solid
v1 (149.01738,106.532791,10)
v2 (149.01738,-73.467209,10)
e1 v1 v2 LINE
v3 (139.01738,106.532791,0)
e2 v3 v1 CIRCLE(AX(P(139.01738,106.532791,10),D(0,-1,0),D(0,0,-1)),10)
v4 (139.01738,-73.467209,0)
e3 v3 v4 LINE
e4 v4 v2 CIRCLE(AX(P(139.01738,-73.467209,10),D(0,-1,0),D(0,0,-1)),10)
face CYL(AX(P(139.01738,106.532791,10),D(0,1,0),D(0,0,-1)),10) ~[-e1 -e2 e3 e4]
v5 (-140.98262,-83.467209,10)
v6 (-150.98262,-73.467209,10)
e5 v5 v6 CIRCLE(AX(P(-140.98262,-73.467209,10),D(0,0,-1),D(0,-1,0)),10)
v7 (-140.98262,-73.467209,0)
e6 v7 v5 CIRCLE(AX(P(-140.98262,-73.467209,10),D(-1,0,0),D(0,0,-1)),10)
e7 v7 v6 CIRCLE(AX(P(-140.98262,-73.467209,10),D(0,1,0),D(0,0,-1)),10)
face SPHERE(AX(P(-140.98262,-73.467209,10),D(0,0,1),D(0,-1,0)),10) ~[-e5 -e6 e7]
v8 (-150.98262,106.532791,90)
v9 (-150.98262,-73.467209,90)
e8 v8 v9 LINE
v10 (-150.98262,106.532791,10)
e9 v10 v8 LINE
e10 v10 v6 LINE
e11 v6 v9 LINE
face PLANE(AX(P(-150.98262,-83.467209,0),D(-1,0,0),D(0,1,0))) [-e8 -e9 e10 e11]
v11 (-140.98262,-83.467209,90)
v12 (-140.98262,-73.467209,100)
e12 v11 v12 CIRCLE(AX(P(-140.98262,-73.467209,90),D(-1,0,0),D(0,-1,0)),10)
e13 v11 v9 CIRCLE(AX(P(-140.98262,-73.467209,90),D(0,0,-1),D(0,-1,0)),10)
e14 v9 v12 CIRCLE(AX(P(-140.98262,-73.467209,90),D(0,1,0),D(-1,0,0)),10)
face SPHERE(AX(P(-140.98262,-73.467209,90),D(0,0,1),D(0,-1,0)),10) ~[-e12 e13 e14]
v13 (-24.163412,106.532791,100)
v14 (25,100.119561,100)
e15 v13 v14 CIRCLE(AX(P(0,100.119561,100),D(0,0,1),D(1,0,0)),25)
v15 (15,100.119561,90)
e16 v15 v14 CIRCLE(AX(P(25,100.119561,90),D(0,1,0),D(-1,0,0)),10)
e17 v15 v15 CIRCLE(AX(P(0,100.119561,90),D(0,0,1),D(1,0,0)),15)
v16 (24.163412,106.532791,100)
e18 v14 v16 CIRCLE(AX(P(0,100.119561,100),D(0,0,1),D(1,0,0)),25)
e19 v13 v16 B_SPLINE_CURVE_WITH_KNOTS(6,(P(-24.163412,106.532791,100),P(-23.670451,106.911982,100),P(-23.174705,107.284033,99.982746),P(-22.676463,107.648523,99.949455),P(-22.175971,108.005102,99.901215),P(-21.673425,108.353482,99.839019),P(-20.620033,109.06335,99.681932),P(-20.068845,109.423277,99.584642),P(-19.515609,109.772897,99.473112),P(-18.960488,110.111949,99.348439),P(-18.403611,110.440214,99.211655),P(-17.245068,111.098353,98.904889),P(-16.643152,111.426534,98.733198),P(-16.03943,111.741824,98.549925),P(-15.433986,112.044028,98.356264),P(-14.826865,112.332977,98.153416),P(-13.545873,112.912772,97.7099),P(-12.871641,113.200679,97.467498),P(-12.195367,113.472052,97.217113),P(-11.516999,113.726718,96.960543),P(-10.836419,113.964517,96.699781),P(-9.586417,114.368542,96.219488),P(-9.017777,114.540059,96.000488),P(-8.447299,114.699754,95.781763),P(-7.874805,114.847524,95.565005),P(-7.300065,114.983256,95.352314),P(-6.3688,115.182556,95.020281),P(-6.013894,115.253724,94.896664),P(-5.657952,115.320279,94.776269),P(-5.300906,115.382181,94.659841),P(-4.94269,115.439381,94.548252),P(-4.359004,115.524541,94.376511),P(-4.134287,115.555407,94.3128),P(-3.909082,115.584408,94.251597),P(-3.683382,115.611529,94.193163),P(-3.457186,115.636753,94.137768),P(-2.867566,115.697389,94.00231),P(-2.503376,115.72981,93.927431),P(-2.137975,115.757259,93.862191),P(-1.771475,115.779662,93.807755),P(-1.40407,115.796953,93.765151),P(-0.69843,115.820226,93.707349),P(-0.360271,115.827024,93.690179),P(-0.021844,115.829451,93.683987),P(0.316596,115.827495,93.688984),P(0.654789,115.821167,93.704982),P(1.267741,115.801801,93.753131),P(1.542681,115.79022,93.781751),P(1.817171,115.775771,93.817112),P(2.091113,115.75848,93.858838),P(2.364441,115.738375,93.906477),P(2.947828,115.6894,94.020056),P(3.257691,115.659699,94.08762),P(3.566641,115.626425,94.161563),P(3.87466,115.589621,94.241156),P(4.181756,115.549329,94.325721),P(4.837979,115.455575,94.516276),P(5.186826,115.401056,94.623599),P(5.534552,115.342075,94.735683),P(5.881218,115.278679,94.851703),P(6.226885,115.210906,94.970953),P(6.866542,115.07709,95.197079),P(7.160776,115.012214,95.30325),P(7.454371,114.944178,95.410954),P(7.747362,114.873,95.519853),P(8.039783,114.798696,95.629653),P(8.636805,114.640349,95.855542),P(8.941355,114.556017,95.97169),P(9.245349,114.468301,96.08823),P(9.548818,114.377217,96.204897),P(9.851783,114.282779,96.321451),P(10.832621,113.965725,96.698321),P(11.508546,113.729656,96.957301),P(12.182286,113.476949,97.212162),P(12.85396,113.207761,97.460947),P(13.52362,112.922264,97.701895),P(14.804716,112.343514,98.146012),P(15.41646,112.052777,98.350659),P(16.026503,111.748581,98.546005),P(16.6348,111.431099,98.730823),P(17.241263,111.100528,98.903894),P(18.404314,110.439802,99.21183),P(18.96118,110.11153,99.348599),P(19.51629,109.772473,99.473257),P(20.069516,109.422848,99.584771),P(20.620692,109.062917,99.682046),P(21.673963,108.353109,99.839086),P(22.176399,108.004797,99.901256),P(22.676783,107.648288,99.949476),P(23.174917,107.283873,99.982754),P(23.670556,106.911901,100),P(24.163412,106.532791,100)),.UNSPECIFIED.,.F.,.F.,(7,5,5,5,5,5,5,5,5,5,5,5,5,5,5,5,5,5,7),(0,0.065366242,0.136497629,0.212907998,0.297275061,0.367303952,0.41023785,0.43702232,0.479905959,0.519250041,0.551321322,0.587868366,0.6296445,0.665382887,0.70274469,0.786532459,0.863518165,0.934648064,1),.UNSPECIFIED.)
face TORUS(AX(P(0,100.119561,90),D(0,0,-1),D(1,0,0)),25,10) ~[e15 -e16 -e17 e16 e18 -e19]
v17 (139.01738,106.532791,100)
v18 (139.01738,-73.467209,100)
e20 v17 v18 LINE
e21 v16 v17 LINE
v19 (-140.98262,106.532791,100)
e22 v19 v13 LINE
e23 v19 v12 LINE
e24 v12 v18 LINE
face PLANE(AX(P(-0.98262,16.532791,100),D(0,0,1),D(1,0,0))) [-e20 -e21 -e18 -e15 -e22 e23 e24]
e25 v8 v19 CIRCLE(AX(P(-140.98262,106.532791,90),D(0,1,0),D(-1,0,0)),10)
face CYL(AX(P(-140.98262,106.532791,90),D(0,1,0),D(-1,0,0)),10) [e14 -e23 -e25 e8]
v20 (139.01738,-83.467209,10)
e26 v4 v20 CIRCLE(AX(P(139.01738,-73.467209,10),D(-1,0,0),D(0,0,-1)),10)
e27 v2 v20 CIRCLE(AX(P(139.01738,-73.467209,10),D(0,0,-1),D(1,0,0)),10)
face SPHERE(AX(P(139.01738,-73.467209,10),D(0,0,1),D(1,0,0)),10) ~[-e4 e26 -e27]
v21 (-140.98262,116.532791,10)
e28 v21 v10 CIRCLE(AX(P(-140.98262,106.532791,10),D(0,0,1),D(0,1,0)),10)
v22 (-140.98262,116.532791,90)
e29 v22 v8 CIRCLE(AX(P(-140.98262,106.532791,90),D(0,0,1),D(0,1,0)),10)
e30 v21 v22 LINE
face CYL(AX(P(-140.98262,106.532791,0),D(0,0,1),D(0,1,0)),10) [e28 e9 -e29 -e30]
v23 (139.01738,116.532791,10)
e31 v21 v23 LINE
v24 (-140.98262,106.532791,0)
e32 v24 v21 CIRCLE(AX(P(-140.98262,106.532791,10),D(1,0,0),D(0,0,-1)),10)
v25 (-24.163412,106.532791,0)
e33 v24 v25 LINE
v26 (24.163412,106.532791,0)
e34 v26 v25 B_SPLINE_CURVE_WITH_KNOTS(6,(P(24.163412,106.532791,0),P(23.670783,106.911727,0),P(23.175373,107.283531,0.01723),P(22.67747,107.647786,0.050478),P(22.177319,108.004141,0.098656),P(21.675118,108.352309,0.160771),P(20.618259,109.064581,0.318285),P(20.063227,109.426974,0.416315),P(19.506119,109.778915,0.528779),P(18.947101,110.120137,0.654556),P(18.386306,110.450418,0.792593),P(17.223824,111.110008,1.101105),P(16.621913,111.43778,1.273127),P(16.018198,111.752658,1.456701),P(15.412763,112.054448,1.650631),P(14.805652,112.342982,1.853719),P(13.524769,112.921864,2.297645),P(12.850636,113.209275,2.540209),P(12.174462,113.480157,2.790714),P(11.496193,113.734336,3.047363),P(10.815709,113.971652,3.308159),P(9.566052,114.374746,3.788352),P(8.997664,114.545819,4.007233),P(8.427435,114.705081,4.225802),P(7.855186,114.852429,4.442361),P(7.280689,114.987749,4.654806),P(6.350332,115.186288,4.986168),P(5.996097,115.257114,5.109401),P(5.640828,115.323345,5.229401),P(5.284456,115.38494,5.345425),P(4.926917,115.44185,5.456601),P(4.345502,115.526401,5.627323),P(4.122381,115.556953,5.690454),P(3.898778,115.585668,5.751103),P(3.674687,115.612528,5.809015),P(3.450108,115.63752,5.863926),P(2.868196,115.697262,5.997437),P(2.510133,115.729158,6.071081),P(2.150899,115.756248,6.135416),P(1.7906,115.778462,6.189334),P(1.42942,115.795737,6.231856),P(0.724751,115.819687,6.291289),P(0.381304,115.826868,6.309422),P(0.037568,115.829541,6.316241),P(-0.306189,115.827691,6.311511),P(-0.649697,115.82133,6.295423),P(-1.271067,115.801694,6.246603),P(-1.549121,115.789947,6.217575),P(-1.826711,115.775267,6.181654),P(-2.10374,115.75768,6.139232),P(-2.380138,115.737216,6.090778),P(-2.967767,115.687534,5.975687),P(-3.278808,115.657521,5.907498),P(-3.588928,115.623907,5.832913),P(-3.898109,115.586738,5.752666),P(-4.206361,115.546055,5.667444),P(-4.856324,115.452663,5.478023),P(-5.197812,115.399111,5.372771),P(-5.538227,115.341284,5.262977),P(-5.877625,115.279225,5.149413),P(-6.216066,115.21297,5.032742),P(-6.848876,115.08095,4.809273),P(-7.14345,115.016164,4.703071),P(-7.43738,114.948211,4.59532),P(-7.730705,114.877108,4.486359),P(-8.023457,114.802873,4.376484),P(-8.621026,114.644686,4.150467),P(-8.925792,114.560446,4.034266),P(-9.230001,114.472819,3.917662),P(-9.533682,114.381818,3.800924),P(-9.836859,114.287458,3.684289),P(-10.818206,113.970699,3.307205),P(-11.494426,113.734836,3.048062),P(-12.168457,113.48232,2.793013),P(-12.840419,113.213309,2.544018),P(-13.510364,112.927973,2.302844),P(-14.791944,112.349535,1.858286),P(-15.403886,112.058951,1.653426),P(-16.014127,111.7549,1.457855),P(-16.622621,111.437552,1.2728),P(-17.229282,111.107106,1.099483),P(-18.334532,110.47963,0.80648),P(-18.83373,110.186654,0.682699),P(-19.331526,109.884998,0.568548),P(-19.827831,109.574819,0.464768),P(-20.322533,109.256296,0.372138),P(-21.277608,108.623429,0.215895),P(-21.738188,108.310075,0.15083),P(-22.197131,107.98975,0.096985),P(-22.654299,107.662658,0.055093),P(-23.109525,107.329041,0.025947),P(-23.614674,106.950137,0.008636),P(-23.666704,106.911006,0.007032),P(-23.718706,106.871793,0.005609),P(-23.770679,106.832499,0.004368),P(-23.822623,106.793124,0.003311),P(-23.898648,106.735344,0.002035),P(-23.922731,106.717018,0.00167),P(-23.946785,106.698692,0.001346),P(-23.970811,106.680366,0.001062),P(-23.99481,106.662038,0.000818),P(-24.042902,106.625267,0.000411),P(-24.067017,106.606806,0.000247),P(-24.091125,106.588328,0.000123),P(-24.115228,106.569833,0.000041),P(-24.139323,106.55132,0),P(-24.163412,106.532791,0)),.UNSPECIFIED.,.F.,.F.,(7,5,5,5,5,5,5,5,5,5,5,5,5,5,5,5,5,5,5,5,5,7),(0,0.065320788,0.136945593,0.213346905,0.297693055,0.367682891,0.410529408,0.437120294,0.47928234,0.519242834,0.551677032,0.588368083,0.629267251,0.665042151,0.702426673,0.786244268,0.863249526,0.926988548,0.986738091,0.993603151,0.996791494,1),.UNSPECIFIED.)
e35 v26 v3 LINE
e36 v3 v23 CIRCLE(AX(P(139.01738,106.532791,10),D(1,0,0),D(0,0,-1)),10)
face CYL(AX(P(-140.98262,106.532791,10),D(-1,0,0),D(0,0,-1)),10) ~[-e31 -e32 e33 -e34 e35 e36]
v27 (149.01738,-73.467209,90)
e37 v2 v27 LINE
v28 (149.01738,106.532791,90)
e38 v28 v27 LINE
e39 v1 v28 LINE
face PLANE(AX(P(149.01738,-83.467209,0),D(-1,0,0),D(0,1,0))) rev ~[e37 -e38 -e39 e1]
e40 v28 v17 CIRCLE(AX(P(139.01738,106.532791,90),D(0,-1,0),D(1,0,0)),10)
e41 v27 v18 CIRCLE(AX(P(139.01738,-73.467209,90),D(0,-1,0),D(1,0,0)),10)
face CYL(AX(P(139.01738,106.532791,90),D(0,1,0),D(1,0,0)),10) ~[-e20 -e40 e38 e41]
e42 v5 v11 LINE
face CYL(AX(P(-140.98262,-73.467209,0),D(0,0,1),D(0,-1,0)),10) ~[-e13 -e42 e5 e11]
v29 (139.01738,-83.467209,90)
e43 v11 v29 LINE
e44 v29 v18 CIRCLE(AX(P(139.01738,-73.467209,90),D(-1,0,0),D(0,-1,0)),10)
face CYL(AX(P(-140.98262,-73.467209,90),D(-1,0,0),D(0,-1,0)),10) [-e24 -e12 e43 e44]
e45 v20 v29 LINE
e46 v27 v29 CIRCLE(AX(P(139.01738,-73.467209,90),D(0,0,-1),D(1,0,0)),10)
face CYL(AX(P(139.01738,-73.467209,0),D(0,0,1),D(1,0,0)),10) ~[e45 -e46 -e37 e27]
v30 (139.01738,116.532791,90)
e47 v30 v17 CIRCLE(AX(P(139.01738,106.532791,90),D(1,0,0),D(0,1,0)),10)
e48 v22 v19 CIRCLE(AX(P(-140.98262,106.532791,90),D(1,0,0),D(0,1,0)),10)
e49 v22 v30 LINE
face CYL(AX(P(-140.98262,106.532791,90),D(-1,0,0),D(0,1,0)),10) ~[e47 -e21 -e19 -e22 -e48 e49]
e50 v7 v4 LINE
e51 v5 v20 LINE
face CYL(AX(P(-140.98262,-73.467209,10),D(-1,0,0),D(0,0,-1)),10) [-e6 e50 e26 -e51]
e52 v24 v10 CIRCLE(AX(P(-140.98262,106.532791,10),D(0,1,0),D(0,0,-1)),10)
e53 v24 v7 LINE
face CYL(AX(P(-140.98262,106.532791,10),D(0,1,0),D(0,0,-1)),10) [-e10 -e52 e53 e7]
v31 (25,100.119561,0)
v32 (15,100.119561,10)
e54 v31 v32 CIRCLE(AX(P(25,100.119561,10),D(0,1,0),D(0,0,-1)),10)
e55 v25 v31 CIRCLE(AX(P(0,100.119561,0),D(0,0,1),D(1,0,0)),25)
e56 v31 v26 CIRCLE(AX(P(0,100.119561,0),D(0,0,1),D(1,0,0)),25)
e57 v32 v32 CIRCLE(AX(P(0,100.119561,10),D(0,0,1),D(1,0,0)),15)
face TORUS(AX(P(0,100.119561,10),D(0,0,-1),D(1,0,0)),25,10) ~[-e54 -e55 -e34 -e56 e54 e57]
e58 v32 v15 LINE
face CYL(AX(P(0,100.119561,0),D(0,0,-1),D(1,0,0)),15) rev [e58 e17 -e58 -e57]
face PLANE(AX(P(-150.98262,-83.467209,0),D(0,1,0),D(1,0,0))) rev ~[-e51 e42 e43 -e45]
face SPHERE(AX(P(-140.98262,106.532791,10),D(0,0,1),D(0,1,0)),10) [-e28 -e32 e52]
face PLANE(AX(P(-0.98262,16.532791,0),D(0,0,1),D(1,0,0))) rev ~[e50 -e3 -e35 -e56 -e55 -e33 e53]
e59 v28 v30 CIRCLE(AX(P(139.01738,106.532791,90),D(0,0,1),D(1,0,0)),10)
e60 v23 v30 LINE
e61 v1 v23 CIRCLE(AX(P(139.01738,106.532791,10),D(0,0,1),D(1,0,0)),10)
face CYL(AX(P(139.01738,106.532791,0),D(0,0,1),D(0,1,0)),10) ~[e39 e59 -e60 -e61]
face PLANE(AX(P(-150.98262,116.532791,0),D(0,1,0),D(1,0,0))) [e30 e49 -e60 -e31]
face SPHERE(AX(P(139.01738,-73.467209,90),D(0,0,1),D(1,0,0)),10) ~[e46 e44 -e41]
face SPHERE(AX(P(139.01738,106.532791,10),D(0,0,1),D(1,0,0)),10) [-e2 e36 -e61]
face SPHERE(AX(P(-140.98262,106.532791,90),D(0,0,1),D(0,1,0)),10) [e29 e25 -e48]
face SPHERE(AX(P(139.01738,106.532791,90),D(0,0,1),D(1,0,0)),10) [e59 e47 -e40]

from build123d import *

# Parameters (mm, degrees)
F0_W         = 300
F0_H         = 200
F0_R         = 15
F1_DEPTH     = 100
F2_R         = 10
F3_R         = 10
F4_R         = 10
F5_R         = 10
F6_T1_DEPTH  = 280
F6_T3_DEPTH  = 180
F6_T6_ANGLE  = 90
F6_T8_ANGLE  = 90
F6_T10_ANGLE = 90
F6_T12_ANGLE = 90
F7_T1_DEPTH  = 280
F7_T3_DEPTH  = 180
F7_T6_ANGLE  = 90
F7_T8_ANGLE  = 90
F7_T10_ANGLE = 90
F7_T12_ANGLE = 90


# Not quite as in the source:
# - a fillet or chamfer that OpenCascade refuses, or shapes differently, is made with other operations: its cross-section is extruded or revolved along the edge and cut away or added


with BuildPart() as f1:
    # F0 (on Top) → F1 (new body)
    with BuildSketch(Plane.XY):
        with Locations((-0.982619822, 16.5327907399)):
            Rectangle(F0_W, F0_H)
        with Locations((0, 100.119560957)):
            Circle(F0_R, mode=Mode.SUBTRACT)
    extrude(amount=F1_DEPTH)

    # F2
    f2_edges = [f1.edges().sort_by_distance(p)[0] for p in [
        (149.01738, 116.532791, 50),
    ]]
    fillet(f2_edges, radius=F2_R)

    # F3
    f3_edges = [f1.edges().sort_by_distance(p)[0] for p in [
        (-150.98262, 116.532791, 50),
    ]]
    fillet(f3_edges, radius=F3_R)

    # F4
    f4_edges = [f1.edges().sort_by_distance(p)[0] for p in [
        (149.01738, -83.467209, 50),
    ]]
    fillet(f4_edges, radius=F4_R)

    # F5
    f5_edges = [f1.edges().sort_by_distance(p)[0] for p in [
        (-150.98262, -83.467209, 50),
    ]]
    fillet(f5_edges, radius=F5_R)

    # F6: fillet of radius 10 on 9 edges, made by hand

    # F6_s2 → F6_t1 (cut)
    with BuildSketch(Plane.YZ.offset(-140.982619822)):
        with BuildLine():
            ThreePointArc((-83.4672092601, 90), (-80.538277072, 97.0710678119), (-73.4672092601, 100))
            Line((-73.4672092601, 100), (-83.4672092601, 100))
            Line((-83.4672092601, 100), (-83.4672092601, 90))
        make_face()
        with BuildLine():
            ThreePointArc((116.5327907399, 90), (113.6038585518, 97.0710678119), (106.5327907399, 100))
            Line((106.5327907399, 100), (116.5327907399, 100))
            Line((116.5327907399, 100), (116.5327907399, 90))
        make_face()
    extrude(amount=F6_T1_DEPTH, mode=Mode.SUBTRACT)

    # F6_s4 → F6_t3 (cut)
    with BuildSketch(Plane.XZ.offset(-106.5327907399)):
        with BuildLine():
            ThreePointArc((-150.982619822, 90), (-148.0536876339, 97.0710678119), (-140.982619822, 100))
            Line((-140.982619822, 100), (-150.982619822, 100))
            Line((-150.982619822, 100), (-150.982619822, 90))
        make_face()
        with BuildLine():
            ThreePointArc((149.017380178, 90), (146.0884479898, 97.0710678119), (139.017380178, 100))
            Line((139.017380178, 100), (149.017380178, 100))
            Line((149.017380178, 100), (149.017380178, 90))
        make_face()
    extrude(amount=F6_T3_DEPTH, mode=Mode.SUBTRACT)

    # F6_s5 → F6_t6 (revolve, cut)
    with BuildSketch(Plane.YZ.offset(-140.982619822)):
        with BuildLine():
            ThreePointArc((-83.4672092601, 90), (-80.538277072, 97.0710678119), (-73.4672092601, 100))
            Line((-73.4672092601, 100), (-83.4672092601, 100))
            Line((-83.4672092601, 100), (-83.4672092601, 90))
        make_face()
    revolve(axis=Axis((-140.982619822, -73.4672092601, 100), (0, 0, -1)), revolution_arc=F6_T6_ANGLE, mode=Mode.SUBTRACT)

    # F6_s7 → F6_t8 (revolve, cut)
    with BuildSketch(Plane.XZ.offset(73.4672092601)):
        with BuildLine():
            ThreePointArc((149.017380178, 90), (146.0884479898, 97.0710678119), (139.017380178, 100))
            Line((139.017380178, 100), (149.017380178, 100))
            Line((149.017380178, 100), (149.017380178, 90))
        make_face()
    revolve(axis=Axis((139.017380178, -73.4672092601, 100), (0, 0, -1)), revolution_arc=F6_T8_ANGLE, mode=Mode.SUBTRACT)

    # F6_s9 → F6_t10 (revolve, cut)
    with BuildSketch(Plane.YZ.offset(-140.982619822)):
        with BuildLine():
            ThreePointArc((116.5327907399, 90), (113.6038585518, 97.0710678119), (106.5327907399, 100))
            Line((106.5327907399, 100), (116.5327907399, 100))
            Line((116.5327907399, 100), (116.5327907399, 90))
        make_face()
    revolve(axis=Axis((-140.982619822, 106.5327907399, 100), (0, 0, 1)), revolution_arc=F6_T10_ANGLE, mode=Mode.SUBTRACT)

    # F6_s11 → F6_t12 (revolve, cut)
    with BuildSketch(Plane.XZ.offset(-106.5327907399)):
        with BuildLine():
            ThreePointArc((149.017380178, 90), (146.0884479898, 97.0710678119), (139.017380178, 100))
            Line((139.017380178, 100), (149.017380178, 100))
            Line((149.017380178, 100), (149.017380178, 90))
        make_face()
    revolve(axis=Axis((139.017380178, 106.5327907399, 100), (0, 0, 1)), revolution_arc=F6_T12_ANGLE, mode=Mode.SUBTRACT)

    # F6_s13 → F6_t14 (revolve, cut)
    with BuildSketch(Plane.XZ.offset(-100.119560957)):
        with BuildLine():
            ThreePointArc((15, 90), (17.9289321881, 97.0710678119), (25, 100))
            Line((25, 100), (15, 100))
            Line((15, 100), (15, 90))
        make_face()
    revolve(axis=Axis((0, 100.119560957, 100), (0, 0, 1)), mode=Mode.SUBTRACT)

    # F7: fillet of radius 10 on 9 edges, made by hand

    # F7_s2 → F7_t1 (cut)
    with BuildSketch(Plane.YZ.offset(-140.982619822)):
        with BuildLine():
            ThreePointArc((-73.4672092601, 0), (-80.538277072, 2.9289321881), (-83.4672092601, 10))
            Line((-83.4672092601, 10), (-83.4672092601, 0))
            Line((-83.4672092601, 0), (-73.4672092601, 0))
        make_face()
        with BuildLine():
            ThreePointArc((106.5327907399, 0), (113.6038585518, 2.9289321881), (116.5327907399, 10))
            Line((116.5327907399, 10), (116.5327907399, 0))
            Line((116.5327907399, 0), (106.5327907399, 0))
        make_face()
    extrude(amount=F7_T1_DEPTH, mode=Mode.SUBTRACT)

    # F7_s4 → F7_t3 (cut)
    with BuildSketch(Plane.XZ.offset(-106.5327907399)):
        with BuildLine():
            ThreePointArc((-140.982619822, 0), (-148.0536876339, 2.9289321881), (-150.982619822, 10))
            Line((-150.982619822, 10), (-150.982619822, 0))
            Line((-150.982619822, 0), (-140.982619822, 0))
        make_face()
        with BuildLine():
            ThreePointArc((139.017380178, 0), (146.0884479898, 2.9289321881), (149.017380178, 10))
            Line((149.017380178, 10), (149.017380178, 0))
            Line((149.017380178, 0), (139.017380178, 0))
        make_face()
    extrude(amount=F7_T3_DEPTH, mode=Mode.SUBTRACT)

    # F7_s5 → F7_t6 (revolve, cut)
    with BuildSketch(Plane.YZ.offset(-140.982619822)):
        with BuildLine():
            ThreePointArc((-73.4672092601, 0), (-80.538277072, 2.9289321881), (-83.4672092601, 10))
            Line((-83.4672092601, 10), (-83.4672092601, 0))
            Line((-83.4672092601, 0), (-73.4672092601, 0))
        make_face()
    revolve(axis=Axis((-140.982619822, -73.4672092601, 0), (0, 0, -1)), revolution_arc=F7_T6_ANGLE, mode=Mode.SUBTRACT)

    # F7_s7 → F7_t8 (revolve, cut)
    with BuildSketch(Plane.XZ.offset(73.4672092601)):
        with BuildLine():
            ThreePointArc((139.017380178, 0), (146.0884479898, 2.9289321881), (149.017380178, 10))
            Line((149.017380178, 10), (149.017380178, 0))
            Line((149.017380178, 0), (139.017380178, 0))
        make_face()
    revolve(axis=Axis((139.017380178, -73.4672092601, 0), (0, 0, -1)), revolution_arc=F7_T8_ANGLE, mode=Mode.SUBTRACT)

    # F7_s9 → F7_t10 (revolve, cut)
    with BuildSketch(Plane.YZ.offset(-140.982619822)):
        with BuildLine():
            ThreePointArc((106.5327907399, 0), (113.6038585518, 2.9289321881), (116.5327907399, 10))
            Line((116.5327907399, 10), (116.5327907399, 0))
            Line((116.5327907399, 0), (106.5327907399, 0))
        make_face()
    revolve(axis=Axis((-140.982619822, 106.5327907399, 0), (0, 0, 1)), revolution_arc=F7_T10_ANGLE, mode=Mode.SUBTRACT)

    # F7_s11 → F7_t12 (revolve, cut)
    with BuildSketch(Plane.XZ.offset(-106.5327907399)):
        with BuildLine():
            ThreePointArc((139.017380178, 0), (146.0884479898, 2.9289321881), (149.017380178, 10))
            Line((149.017380178, 10), (149.017380178, 0))
            Line((149.017380178, 0), (139.017380178, 0))
        make_face()
    revolve(axis=Axis((139.017380178, 106.5327907399, 0), (0, 0, 1)), revolution_arc=F7_T12_ANGLE, mode=Mode.SUBTRACT)

    # F7_s13 → F7_t14 (revolve, cut)
    with BuildSketch(Plane.XZ.offset(-100.119560957)):
        with BuildLine():
            ThreePointArc((25, 0), (17.9289321881, 2.9289321881), (15, 10))
            Line((15, 10), (15, 0))
            Line((15, 0), (25, 0))
        make_face()
    revolve(axis=Axis((0, 100.119560957, 0), (0, 0, 1)), mode=Mode.SUBTRACT)


solid = f1.part
